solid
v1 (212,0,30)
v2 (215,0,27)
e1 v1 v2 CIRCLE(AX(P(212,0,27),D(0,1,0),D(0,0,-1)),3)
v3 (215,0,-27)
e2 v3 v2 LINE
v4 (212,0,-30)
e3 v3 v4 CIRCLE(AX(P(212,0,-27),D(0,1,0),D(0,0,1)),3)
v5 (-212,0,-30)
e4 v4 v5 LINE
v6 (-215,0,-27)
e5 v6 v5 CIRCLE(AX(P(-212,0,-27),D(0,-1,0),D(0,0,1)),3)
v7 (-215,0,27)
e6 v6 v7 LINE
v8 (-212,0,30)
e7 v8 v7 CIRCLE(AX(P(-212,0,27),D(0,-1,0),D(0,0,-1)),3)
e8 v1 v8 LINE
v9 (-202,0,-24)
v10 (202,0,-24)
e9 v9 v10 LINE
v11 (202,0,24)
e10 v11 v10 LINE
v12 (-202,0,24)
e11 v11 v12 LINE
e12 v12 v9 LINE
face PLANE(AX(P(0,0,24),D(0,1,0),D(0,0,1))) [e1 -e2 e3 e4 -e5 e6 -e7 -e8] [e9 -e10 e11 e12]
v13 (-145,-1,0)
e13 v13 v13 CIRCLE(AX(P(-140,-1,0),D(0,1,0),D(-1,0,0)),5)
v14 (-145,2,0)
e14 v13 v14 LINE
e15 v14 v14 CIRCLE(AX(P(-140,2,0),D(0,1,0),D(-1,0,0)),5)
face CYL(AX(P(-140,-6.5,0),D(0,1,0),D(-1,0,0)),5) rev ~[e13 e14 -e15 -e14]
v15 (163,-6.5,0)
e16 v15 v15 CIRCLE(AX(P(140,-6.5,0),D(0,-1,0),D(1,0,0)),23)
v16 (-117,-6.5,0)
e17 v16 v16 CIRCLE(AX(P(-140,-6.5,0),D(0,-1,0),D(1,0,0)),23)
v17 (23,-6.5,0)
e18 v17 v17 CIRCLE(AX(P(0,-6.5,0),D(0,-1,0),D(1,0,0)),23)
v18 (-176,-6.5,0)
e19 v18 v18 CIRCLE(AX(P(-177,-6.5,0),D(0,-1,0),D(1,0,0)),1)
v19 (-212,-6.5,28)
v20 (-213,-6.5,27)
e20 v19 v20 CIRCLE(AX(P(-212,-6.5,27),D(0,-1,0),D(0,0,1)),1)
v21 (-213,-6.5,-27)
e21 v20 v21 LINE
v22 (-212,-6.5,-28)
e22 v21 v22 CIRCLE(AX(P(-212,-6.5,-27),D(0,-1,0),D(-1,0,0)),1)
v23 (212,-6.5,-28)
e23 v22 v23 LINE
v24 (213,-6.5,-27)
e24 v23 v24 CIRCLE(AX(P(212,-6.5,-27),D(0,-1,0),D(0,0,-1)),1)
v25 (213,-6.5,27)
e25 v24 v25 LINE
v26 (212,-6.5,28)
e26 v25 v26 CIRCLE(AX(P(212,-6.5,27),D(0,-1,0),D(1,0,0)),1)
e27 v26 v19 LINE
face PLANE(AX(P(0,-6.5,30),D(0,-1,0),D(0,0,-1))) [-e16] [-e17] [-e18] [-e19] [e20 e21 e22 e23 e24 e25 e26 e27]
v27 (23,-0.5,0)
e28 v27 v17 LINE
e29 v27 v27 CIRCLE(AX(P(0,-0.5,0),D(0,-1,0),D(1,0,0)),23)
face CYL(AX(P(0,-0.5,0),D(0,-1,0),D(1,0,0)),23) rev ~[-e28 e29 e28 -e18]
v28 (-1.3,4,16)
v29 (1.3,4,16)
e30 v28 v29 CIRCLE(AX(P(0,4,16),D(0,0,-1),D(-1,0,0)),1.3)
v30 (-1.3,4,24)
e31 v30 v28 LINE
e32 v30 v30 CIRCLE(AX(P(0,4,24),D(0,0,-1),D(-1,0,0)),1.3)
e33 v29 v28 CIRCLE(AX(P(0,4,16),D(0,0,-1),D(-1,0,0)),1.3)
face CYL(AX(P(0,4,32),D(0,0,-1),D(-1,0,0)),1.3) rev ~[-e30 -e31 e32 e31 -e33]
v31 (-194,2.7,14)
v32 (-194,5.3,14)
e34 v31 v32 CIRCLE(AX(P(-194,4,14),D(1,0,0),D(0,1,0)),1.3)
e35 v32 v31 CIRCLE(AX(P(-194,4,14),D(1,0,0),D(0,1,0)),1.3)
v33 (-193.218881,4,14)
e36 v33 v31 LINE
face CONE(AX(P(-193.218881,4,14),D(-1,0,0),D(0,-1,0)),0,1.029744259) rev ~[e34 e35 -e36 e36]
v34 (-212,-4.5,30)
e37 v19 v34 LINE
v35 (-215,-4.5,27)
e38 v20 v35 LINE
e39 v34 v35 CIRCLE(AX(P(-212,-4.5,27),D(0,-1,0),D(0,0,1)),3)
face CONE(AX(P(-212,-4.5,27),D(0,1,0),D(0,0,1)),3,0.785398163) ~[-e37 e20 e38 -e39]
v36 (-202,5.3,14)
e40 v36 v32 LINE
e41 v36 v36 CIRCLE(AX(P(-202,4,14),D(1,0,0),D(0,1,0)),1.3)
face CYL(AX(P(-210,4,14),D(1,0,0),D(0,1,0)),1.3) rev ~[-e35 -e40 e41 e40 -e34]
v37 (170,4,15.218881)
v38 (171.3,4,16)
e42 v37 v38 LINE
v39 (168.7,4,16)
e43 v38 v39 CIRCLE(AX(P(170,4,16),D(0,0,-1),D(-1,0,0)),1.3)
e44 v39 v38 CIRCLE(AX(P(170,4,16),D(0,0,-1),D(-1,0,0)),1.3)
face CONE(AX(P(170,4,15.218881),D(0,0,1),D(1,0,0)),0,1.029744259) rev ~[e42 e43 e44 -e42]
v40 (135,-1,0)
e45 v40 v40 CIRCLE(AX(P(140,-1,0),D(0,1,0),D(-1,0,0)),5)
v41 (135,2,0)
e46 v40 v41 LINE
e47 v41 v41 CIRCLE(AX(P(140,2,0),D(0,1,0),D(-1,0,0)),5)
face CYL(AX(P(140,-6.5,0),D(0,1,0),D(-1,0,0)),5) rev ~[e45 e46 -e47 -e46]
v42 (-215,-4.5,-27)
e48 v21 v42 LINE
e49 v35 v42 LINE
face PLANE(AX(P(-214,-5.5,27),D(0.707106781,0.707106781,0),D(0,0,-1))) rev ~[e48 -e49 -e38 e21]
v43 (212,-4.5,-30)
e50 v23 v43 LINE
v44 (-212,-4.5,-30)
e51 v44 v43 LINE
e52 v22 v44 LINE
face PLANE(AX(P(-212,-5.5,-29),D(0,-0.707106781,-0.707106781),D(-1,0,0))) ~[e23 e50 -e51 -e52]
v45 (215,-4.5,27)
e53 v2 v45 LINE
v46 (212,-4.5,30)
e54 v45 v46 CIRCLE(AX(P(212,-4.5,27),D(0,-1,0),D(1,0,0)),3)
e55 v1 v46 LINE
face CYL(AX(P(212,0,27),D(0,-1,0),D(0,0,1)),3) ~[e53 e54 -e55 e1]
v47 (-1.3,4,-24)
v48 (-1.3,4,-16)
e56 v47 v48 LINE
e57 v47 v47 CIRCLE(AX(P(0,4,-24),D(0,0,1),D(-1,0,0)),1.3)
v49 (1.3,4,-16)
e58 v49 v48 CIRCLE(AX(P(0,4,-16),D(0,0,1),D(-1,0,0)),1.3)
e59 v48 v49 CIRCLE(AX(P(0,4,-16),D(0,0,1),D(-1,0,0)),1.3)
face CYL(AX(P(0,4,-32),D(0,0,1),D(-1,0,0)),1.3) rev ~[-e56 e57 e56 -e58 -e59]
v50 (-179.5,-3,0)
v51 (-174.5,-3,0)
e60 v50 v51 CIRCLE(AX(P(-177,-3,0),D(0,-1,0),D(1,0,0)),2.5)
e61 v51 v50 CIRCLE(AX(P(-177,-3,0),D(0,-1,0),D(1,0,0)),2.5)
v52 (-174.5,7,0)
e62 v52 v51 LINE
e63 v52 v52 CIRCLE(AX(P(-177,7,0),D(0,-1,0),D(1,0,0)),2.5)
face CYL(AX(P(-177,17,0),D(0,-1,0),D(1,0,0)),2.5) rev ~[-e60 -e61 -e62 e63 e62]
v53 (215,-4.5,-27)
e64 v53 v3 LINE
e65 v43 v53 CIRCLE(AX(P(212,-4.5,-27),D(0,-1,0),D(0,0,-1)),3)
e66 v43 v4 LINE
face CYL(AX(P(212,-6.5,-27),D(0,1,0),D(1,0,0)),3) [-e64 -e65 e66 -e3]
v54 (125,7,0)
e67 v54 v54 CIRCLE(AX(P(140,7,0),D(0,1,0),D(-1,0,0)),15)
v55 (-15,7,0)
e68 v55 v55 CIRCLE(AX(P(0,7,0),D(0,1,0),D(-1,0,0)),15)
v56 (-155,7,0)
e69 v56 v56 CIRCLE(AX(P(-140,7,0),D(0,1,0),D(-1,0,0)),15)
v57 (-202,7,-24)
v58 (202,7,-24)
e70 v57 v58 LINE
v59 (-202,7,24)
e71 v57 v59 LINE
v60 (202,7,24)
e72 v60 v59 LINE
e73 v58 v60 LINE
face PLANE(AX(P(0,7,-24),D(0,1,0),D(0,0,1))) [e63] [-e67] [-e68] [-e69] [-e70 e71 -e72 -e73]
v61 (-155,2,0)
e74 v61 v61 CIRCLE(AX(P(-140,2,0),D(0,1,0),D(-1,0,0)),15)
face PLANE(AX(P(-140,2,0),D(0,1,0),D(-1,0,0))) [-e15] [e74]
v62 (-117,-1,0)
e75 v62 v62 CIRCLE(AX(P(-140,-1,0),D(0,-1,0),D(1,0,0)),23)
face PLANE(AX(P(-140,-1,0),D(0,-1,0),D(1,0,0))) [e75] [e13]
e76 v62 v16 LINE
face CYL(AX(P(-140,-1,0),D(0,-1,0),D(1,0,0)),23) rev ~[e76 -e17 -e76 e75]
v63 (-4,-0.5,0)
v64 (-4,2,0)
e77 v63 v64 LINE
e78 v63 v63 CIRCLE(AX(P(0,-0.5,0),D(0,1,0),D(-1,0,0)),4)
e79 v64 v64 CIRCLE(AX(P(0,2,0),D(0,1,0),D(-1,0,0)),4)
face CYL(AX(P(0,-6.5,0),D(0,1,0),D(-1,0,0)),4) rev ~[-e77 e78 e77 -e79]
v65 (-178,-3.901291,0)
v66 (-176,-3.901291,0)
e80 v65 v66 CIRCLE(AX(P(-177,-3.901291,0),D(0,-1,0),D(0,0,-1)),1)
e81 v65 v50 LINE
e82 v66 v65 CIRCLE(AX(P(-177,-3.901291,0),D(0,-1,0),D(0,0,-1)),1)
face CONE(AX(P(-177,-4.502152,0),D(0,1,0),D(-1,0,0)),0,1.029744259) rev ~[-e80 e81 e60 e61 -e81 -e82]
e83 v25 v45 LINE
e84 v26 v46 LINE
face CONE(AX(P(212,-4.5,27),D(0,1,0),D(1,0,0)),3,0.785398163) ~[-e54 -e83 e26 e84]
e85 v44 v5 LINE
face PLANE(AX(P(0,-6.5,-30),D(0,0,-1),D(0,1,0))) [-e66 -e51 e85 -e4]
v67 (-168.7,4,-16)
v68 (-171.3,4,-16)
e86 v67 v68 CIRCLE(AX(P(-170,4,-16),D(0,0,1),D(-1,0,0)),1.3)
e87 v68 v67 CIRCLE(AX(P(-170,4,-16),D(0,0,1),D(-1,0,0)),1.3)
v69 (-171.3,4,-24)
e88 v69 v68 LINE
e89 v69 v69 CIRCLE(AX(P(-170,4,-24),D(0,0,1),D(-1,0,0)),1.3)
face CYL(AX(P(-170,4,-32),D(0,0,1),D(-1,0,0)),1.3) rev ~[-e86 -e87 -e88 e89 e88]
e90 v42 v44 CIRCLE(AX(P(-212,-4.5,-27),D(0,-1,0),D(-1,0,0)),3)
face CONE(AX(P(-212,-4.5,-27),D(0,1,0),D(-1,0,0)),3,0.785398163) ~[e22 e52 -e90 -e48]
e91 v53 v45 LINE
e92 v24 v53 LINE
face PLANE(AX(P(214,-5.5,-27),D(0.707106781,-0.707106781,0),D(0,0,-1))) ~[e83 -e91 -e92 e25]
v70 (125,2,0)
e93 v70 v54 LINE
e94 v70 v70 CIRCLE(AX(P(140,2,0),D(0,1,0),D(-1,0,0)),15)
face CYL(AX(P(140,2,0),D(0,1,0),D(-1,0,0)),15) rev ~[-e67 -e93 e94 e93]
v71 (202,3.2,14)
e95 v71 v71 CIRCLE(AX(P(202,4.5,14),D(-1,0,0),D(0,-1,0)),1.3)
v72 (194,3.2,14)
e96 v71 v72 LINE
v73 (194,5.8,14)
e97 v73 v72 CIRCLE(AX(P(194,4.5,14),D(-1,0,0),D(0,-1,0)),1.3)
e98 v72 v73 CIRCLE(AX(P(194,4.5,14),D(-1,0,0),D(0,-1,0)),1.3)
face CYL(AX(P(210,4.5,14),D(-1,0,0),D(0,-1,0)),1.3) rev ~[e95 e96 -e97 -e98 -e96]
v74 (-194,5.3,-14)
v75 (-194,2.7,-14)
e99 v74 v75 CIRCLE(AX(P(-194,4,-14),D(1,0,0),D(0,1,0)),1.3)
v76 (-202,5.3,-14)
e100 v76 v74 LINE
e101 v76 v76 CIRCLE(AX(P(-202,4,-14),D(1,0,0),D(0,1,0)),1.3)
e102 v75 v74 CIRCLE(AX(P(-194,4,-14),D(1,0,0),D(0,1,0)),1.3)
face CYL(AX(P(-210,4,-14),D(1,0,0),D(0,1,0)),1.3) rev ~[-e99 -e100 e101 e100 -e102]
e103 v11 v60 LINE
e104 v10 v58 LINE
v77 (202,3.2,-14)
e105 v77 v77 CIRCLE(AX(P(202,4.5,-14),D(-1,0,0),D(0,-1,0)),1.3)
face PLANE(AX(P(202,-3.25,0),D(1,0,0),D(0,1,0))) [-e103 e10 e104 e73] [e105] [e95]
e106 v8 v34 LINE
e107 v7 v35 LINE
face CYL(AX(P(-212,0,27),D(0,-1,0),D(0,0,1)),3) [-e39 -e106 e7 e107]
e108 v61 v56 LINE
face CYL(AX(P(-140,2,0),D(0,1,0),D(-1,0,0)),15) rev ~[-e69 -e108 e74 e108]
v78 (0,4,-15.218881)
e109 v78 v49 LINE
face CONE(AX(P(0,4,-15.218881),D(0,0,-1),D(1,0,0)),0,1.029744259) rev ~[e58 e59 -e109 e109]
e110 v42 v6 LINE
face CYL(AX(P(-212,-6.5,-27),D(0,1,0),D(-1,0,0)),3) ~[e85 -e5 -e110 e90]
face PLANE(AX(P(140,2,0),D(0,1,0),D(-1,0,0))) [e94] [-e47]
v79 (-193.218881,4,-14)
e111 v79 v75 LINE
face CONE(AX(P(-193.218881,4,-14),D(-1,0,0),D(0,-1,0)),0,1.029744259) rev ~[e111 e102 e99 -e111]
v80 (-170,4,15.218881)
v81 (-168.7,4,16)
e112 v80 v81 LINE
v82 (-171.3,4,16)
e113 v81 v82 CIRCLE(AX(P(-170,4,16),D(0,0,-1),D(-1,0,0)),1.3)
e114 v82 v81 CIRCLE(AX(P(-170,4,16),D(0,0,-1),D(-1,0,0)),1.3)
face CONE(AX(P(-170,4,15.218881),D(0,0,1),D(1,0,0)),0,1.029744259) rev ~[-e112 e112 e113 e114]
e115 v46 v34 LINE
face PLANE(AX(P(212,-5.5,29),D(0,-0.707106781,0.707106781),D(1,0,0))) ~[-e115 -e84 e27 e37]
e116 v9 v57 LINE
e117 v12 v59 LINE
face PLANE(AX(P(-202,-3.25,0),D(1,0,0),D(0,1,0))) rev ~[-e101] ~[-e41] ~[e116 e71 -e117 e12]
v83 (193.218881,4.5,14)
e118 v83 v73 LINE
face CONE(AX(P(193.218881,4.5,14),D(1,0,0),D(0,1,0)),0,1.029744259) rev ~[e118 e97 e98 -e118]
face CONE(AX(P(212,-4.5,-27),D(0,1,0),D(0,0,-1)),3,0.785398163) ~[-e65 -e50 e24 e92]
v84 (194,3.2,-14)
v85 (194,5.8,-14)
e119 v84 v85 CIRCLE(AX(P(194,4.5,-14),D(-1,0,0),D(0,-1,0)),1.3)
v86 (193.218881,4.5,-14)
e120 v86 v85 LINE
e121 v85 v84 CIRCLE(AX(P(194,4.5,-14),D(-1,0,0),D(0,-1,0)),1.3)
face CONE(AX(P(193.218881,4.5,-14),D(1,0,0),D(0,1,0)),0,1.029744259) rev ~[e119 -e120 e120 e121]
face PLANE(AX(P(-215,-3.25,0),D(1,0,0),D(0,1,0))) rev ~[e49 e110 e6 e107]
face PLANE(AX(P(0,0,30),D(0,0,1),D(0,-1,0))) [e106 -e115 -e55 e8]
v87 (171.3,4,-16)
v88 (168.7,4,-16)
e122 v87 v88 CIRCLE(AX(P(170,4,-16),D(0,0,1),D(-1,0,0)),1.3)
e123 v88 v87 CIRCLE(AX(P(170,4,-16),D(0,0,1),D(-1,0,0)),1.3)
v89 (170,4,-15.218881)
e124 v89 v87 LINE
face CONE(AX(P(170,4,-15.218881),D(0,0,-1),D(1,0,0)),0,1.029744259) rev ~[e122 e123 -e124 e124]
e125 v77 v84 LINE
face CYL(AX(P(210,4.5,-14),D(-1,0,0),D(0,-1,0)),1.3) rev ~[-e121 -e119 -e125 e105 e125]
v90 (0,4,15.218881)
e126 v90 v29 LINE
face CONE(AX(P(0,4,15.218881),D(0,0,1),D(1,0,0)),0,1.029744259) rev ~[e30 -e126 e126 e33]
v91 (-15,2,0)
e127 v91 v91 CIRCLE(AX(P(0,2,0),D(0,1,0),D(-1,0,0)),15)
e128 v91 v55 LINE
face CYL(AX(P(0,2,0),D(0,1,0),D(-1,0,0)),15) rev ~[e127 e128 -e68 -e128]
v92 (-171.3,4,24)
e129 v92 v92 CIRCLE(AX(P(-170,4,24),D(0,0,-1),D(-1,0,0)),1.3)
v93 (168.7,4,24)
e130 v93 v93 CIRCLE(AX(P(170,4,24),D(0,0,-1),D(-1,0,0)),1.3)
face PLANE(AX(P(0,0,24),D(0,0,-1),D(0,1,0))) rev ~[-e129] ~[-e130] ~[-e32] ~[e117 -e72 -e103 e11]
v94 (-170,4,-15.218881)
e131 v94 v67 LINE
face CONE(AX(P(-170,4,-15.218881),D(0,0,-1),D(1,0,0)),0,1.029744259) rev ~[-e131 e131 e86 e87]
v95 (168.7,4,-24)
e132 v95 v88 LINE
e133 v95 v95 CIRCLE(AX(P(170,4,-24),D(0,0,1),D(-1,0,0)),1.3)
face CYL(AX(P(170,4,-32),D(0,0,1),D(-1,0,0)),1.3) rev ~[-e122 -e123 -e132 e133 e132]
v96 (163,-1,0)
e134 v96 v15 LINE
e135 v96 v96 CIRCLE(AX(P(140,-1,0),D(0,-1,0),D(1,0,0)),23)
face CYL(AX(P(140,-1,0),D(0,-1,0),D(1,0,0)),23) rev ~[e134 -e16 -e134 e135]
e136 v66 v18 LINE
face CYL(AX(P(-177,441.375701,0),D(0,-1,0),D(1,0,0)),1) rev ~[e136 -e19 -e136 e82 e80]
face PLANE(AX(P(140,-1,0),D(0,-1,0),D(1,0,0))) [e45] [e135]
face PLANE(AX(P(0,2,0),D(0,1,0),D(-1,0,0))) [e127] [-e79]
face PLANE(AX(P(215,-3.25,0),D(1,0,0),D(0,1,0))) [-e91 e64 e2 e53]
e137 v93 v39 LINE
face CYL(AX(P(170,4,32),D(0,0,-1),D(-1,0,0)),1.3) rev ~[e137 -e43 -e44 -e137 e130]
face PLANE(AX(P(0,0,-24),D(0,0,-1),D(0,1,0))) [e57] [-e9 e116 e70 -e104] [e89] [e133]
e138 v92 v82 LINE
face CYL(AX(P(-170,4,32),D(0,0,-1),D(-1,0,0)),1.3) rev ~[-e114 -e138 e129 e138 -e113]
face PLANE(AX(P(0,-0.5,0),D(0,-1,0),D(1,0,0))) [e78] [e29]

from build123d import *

# Parameters (mm, degrees)
F1_DEPTH        = 215
F0_W            = 7
F0_H            = 48
F2_DEPTH        = 202
F4_D            = 8
F4_CBORE_D      = 46
F4_CBORE_DEPTH  = 6
F5_D            = 10
F5_CBORE_D      = 46
F5_CBORE_DEPTH  = 5.5
F9_D            = 2.6
F9_DEPTH        = 8
F9_TIP          = 0.7811188047
F9_ON_F6_D      = 2.6
F9_ON_F6_DEPTH  = 8
F9_ON_F6_TIP    = 0.7811188047
F9_ON_F7_D      = 2.6
F9_ON_F7_DEPTH  = 8
F9_ON_F7_TIP    = 0.7811188047
F10_R           = 3
F11_SIZE        = 2
F14_D           = 2.6
F14_DEPTH       = 8
F14_TIP         = 0.7811188047
F15_D           = 8
F15_DEPTH       = 14
F15_CBORE_D     = 30
F15_CBORE_DEPTH = 5
F15_TIP         = 2.4034424761
F17_D           = 2
F19_D           = 5
F19_DEPTH       = 10
F19_TIP         = 1.5021515476


# Not quite as in the source:
# - a feature names something its author has since deleted; it is built from what else it names


with BuildPart() as f1:
    # F0 (on Right) → F1 (new body, symmetric)
    with BuildSketch(Plane.YZ):
        Polygon((0, 24), (0, 30), (-6.5, 30), (-6.5, 17.6169319153), (-6.5, -16.0151308179), (-6.5, -17.6169319153), (-6.5, -30), (0, -30), (0, -24), align=None)
    extrude(amount=F1_DEPTH, both=True)

    # F0 (on Right) → F2 (join, symmetric)
    with BuildSketch(Plane.YZ):
        Polygon((0, 24), (0, 30), (-6.5, 30), (-6.5, 17.6169319153), (-6.5, -16.0151308179), (-6.5, -17.6169319153), (-6.5, -30), (0, -30), (0, -24), align=None)
        with Locations((3.5, 0)):
            Rectangle(F0_W, F0_H)
    extrude(amount=F2_DEPTH, both=True)

    # F4 (through all)
    with Locations(Plane.XZ.offset(6.5)):
        with Locations((0, 0)):
            CounterBoreHole(F4_D / 2, F4_CBORE_D / 2, F4_CBORE_DEPTH)

    # F5 (through all)
    with Locations(Plane.XZ.offset(6.5)):
        with Locations((140, 0), (-140, 0)):
            CounterBoreHole(F5_D / 2, F5_CBORE_D / 2, F5_CBORE_DEPTH)

    # F9
    with Locations(Plane(origin=(-202, 0, 0), x_dir=(0, -1, 0), z_dir=(-1, 0, 0))):
        with Locations((-4, 14), (-4, -14)):
            Hole(F9_D / 2, depth=F9_DEPTH)
            with Locations((0, 0, -(F9_DEPTH + F9_TIP / 2))):  # 118° drill point
                Cone(0, F9_D / 2, F9_TIP, mode=Mode.SUBTRACT)

    # F9 on F6
    with Locations(Plane(origin=(0, 0, -24), x_dir=(1, 0, 0), z_dir=(0, 0, -1))):
        with Locations((-170, -4), (0, -4), (170, -4)):
            Hole(F9_ON_F6_D / 2, depth=F9_ON_F6_DEPTH)
            with Locations((0, 0, -(F9_ON_F6_DEPTH + F9_ON_F6_TIP / 2))):  # 118° drill point
                Cone(0, F9_ON_F6_D / 2, F9_ON_F6_TIP, mode=Mode.SUBTRACT)

    # F9 on F7
    with Locations(Plane.YZ.offset(202)):
        with Locations((4.5, -14), (4.5, 14)):
            Hole(F9_ON_F7_D / 2, depth=F9_ON_F7_DEPTH)
            with Locations((0, 0, -(F9_ON_F7_DEPTH + F9_ON_F7_TIP / 2))):  # 118° drill point
                Cone(0, F9_ON_F7_D / 2, F9_ON_F7_TIP, mode=Mode.SUBTRACT)

    # F10
    f10_edges = [f1.edges().sort_by_distance(p)[0] for p in [
        (215, -3.25, -30),
        (-215, -3.25, -30),
        (215, -3.25, 30),
        (-215, -3.25, 30),
    ]]
    fillet(f10_edges, radius=F10_R)

    # F11
    f11_edges = [f1.edges().sort_by_distance(p)[0] for p in [
        (-215, -6.5, 0),
        (0, -6.5, -30),
        (215, -6.5, 0),
        (0, -6.5, 30),
    ]]
    chamfer(f11_edges, length=F11_SIZE)

    # F14
    with Locations(Plane.XY.offset(24)):
        with Locations((0, 4), (-170, 4), (170, 4)):
            Hole(F14_D / 2, depth=F14_DEPTH)
            with Locations((0, 0, -(F14_DEPTH + F14_TIP / 2))):  # 118° drill point
                Cone(0, F14_D / 2, F14_TIP, mode=Mode.SUBTRACT)

    # F15
    with Locations(Plane(origin=(0, 7, 0), x_dir=(-1, 0, 0), z_dir=(0, 1, 0))):
        with Locations((-140, 0), (0, 0), (140, 0)):
            CounterBoreHole(F15_D / 2, F15_CBORE_D / 2, F15_CBORE_DEPTH, depth=F15_DEPTH)
            with Locations((0, 0, -(F15_DEPTH + F15_TIP / 2))):  # 118° drill point
                Cone(0, F15_D / 2, F15_TIP, mode=Mode.SUBTRACT)

    # F17 (through all)
    with Locations(Plane(origin=(0, 7, 0), x_dir=(-1, 0, 0), z_dir=(0, 1, 0))):
        with Locations((177, 0)):
            Hole(F17_D / 2)

    # F19
    with Locations(Plane(origin=(0, 7, 0), x_dir=(-1, 0, 0), z_dir=(0, 1, 0))):
        with Locations((177, 0)):
            Hole(F19_D / 2, depth=F19_DEPTH)
            with Locations((0, 0, -(F19_DEPTH + F19_TIP / 2))):  # 118° drill point
                Cone(0, F19_D / 2, F19_TIP, mode=Mode.SUBTRACT)


solid = f1.part
